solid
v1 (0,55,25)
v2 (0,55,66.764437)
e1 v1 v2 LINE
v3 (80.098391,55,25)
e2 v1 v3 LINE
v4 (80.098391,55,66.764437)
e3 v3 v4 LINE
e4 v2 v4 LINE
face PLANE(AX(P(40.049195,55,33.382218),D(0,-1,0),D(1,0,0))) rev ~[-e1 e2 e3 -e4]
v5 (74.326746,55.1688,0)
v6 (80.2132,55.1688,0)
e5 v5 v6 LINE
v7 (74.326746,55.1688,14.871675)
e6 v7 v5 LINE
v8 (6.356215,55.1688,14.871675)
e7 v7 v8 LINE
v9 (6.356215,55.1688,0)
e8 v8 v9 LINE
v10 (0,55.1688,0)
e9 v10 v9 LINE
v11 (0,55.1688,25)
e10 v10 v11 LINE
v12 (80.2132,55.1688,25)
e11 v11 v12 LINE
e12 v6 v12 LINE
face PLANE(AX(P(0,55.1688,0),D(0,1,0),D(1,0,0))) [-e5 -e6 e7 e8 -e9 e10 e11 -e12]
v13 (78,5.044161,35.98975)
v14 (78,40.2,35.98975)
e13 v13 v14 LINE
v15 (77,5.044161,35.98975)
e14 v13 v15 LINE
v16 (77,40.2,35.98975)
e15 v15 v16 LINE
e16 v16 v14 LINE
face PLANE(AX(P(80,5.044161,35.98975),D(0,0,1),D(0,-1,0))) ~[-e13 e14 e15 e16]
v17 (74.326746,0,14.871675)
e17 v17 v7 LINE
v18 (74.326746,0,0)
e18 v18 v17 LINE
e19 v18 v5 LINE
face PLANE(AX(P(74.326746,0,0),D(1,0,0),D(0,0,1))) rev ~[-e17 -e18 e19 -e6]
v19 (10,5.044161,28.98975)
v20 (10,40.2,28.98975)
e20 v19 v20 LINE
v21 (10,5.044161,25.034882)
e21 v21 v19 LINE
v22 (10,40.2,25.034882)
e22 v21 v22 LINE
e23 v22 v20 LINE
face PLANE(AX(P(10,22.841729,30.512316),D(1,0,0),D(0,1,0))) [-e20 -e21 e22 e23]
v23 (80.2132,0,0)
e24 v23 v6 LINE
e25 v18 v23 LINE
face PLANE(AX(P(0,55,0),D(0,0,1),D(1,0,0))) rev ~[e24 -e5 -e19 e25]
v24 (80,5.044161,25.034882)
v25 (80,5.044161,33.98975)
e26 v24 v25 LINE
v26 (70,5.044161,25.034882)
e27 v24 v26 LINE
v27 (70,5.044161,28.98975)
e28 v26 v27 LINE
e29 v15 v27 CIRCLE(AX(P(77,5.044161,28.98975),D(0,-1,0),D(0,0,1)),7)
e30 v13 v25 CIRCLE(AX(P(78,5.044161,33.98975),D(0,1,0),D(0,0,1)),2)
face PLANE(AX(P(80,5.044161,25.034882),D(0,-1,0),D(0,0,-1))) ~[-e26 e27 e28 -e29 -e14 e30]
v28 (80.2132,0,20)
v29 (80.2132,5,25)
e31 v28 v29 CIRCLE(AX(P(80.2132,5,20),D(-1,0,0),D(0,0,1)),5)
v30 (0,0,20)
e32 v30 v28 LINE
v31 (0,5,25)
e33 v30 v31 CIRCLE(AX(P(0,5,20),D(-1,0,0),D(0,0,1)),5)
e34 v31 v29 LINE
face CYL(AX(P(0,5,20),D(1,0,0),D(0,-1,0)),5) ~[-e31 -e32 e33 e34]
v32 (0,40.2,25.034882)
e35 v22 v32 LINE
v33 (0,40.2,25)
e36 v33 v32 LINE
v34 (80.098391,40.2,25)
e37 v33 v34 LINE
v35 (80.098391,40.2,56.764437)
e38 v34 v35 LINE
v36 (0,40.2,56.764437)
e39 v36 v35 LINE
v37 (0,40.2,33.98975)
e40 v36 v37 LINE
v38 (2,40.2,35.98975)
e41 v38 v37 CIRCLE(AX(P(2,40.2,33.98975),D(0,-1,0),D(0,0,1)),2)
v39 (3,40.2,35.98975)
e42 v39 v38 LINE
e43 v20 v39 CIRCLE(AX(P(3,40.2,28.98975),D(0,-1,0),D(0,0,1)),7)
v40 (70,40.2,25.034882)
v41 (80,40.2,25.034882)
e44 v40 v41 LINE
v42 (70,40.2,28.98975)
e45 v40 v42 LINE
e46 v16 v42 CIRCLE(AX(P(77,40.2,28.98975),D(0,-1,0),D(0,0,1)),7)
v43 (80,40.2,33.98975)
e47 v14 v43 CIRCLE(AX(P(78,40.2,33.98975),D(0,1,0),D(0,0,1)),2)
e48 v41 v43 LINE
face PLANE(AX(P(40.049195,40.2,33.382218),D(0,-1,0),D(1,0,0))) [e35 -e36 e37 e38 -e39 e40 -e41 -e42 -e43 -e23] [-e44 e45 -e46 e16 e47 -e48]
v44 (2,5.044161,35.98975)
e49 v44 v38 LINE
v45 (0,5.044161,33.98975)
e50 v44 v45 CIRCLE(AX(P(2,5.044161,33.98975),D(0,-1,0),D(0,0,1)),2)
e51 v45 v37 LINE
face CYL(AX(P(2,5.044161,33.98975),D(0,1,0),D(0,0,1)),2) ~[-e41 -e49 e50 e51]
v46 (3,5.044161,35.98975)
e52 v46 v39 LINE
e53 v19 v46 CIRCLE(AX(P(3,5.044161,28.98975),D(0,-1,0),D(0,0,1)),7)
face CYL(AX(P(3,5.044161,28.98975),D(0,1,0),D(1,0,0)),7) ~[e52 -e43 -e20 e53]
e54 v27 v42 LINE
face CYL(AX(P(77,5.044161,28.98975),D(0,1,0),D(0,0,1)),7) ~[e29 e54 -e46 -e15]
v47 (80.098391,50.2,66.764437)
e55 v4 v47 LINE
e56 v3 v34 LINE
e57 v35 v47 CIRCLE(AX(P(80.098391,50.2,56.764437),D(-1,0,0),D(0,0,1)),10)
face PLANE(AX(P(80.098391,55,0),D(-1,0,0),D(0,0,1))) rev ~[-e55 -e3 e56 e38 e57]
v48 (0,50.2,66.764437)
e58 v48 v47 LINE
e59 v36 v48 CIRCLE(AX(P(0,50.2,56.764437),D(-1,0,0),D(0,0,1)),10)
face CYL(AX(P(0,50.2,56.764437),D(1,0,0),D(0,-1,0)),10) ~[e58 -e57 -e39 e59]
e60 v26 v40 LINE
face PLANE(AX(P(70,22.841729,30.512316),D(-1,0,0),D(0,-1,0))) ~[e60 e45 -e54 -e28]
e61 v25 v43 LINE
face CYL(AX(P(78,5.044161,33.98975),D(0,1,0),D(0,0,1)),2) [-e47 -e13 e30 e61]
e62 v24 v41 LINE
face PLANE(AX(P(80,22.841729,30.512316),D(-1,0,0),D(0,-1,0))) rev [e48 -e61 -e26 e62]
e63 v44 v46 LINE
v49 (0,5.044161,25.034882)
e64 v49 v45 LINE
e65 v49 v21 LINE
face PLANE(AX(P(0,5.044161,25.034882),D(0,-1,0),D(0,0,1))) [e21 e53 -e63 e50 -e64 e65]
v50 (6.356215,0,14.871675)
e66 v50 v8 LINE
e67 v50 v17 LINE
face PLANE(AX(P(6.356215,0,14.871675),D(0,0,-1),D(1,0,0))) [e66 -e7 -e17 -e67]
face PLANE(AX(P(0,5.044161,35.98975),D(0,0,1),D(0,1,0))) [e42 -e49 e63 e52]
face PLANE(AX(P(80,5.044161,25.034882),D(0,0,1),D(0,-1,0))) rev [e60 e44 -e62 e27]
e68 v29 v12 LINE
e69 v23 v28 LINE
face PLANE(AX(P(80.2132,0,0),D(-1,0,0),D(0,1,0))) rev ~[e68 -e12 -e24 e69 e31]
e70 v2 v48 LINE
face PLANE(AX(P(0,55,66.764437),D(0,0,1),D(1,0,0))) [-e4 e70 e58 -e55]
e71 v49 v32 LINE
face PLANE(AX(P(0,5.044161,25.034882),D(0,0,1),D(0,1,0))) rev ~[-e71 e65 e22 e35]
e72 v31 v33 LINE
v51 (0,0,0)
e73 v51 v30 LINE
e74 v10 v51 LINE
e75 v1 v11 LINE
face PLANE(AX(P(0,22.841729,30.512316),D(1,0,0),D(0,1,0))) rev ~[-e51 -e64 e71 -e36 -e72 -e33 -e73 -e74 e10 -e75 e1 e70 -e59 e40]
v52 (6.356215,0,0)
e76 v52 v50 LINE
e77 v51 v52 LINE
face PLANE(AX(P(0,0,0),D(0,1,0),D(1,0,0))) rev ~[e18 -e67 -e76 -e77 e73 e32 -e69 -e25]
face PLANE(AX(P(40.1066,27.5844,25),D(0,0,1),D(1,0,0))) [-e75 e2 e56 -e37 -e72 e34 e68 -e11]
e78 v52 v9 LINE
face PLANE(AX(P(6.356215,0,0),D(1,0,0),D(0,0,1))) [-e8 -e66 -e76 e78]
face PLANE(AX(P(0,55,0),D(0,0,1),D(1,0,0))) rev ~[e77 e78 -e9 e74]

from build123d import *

# Parameters (mm, degrees)
F0_W      = 80.2132
F0_H      = 55.1688
F1_DEPTH  = 25
F3_W      = 80.0983905792
F3_H      = 66.7644366622
F4_DEPTH  = 14.8
F6_W      = 67.9705310613
F6_H      = 14.8716745898
F7_DEPTH  = 99
F8_R      = 5
F9_W      = 35.595134832
F9_H      = 10.9548680484
F10_DEPTH = 10
F11_R     = 7
F12_R     = 2
F13_R     = 10


# Not quite as in the source:
# - a pattern or mirror of a feature is missing from the dataset's text; its kind, count and spacing are read off the source's solid


with BuildPart() as f1:
    # F0 (on Top) → F1 (new body)
    with BuildSketch(Plane.XY):
        with Locations((40.1066, 27.5844)):
            Rectangle(F0_W, F0_H)
    extrude(amount=F1_DEPTH)

    # F3 (on offset) → F4 (join)
    with BuildSketch(Plane.XZ.offset(-55)):
        with Locations((40.0491952896, 33.3822183311)):
            Rectangle(F3_W, F3_H)
    extrude(amount=F4_DEPTH)

    # F6 (on Front) → F7 (cut)
    with BuildSketch(Plane.XZ):
        with Locations((40.3414806351, 7.4358372949)):
            Rectangle(F6_W, F6_H)
    extrude(amount=-F7_DEPTH, mode=Mode.SUBTRACT)

    # F8
    f8_edges = [f1.edges().sort_by_distance(p)[0] for p in [
        (40.1066, 0, 25),
    ]]
    fillet(f8_edges, radius=F8_R)

    # F9 (on Right) → F10 (join)
    with BuildSketch(Plane.YZ):
        with Locations((22.8417287581, 30.5123161525)):
            Rectangle(F9_W, F9_H)
    f10 = extrude(amount=F10_DEPTH)

    # F10_copies: F10 across plane
    add(f10.mirror(Plane(origin=(40, 0, 0), x_dir=(0, 0, 1), z_dir=(1, 0, 0))))

    # F11
    f11_edges = [f1.edges().sort_by_distance(p)[0] for p in [
        (10, 22.622081, 35.98975),
        (70, 22.622081, 35.98975),
    ]]
    fillet(f11_edges, radius=F11_R)

    # F12
    f12_edges = [f1.edges().sort_by_distance(p)[0] for p in [
        (0, 22.622081, 35.98975),
        (80, 22.622081, 35.98975),
    ]]
    fillet(f12_edges, radius=F12_R)

    # F13
    f13_edges = [f1.edges().sort_by_distance(p)[0] for p in [
        (40.049195, 40.2, 66.764437),
    ]]
    fillet(f13_edges, radius=F13_R)


solid = f1.part
